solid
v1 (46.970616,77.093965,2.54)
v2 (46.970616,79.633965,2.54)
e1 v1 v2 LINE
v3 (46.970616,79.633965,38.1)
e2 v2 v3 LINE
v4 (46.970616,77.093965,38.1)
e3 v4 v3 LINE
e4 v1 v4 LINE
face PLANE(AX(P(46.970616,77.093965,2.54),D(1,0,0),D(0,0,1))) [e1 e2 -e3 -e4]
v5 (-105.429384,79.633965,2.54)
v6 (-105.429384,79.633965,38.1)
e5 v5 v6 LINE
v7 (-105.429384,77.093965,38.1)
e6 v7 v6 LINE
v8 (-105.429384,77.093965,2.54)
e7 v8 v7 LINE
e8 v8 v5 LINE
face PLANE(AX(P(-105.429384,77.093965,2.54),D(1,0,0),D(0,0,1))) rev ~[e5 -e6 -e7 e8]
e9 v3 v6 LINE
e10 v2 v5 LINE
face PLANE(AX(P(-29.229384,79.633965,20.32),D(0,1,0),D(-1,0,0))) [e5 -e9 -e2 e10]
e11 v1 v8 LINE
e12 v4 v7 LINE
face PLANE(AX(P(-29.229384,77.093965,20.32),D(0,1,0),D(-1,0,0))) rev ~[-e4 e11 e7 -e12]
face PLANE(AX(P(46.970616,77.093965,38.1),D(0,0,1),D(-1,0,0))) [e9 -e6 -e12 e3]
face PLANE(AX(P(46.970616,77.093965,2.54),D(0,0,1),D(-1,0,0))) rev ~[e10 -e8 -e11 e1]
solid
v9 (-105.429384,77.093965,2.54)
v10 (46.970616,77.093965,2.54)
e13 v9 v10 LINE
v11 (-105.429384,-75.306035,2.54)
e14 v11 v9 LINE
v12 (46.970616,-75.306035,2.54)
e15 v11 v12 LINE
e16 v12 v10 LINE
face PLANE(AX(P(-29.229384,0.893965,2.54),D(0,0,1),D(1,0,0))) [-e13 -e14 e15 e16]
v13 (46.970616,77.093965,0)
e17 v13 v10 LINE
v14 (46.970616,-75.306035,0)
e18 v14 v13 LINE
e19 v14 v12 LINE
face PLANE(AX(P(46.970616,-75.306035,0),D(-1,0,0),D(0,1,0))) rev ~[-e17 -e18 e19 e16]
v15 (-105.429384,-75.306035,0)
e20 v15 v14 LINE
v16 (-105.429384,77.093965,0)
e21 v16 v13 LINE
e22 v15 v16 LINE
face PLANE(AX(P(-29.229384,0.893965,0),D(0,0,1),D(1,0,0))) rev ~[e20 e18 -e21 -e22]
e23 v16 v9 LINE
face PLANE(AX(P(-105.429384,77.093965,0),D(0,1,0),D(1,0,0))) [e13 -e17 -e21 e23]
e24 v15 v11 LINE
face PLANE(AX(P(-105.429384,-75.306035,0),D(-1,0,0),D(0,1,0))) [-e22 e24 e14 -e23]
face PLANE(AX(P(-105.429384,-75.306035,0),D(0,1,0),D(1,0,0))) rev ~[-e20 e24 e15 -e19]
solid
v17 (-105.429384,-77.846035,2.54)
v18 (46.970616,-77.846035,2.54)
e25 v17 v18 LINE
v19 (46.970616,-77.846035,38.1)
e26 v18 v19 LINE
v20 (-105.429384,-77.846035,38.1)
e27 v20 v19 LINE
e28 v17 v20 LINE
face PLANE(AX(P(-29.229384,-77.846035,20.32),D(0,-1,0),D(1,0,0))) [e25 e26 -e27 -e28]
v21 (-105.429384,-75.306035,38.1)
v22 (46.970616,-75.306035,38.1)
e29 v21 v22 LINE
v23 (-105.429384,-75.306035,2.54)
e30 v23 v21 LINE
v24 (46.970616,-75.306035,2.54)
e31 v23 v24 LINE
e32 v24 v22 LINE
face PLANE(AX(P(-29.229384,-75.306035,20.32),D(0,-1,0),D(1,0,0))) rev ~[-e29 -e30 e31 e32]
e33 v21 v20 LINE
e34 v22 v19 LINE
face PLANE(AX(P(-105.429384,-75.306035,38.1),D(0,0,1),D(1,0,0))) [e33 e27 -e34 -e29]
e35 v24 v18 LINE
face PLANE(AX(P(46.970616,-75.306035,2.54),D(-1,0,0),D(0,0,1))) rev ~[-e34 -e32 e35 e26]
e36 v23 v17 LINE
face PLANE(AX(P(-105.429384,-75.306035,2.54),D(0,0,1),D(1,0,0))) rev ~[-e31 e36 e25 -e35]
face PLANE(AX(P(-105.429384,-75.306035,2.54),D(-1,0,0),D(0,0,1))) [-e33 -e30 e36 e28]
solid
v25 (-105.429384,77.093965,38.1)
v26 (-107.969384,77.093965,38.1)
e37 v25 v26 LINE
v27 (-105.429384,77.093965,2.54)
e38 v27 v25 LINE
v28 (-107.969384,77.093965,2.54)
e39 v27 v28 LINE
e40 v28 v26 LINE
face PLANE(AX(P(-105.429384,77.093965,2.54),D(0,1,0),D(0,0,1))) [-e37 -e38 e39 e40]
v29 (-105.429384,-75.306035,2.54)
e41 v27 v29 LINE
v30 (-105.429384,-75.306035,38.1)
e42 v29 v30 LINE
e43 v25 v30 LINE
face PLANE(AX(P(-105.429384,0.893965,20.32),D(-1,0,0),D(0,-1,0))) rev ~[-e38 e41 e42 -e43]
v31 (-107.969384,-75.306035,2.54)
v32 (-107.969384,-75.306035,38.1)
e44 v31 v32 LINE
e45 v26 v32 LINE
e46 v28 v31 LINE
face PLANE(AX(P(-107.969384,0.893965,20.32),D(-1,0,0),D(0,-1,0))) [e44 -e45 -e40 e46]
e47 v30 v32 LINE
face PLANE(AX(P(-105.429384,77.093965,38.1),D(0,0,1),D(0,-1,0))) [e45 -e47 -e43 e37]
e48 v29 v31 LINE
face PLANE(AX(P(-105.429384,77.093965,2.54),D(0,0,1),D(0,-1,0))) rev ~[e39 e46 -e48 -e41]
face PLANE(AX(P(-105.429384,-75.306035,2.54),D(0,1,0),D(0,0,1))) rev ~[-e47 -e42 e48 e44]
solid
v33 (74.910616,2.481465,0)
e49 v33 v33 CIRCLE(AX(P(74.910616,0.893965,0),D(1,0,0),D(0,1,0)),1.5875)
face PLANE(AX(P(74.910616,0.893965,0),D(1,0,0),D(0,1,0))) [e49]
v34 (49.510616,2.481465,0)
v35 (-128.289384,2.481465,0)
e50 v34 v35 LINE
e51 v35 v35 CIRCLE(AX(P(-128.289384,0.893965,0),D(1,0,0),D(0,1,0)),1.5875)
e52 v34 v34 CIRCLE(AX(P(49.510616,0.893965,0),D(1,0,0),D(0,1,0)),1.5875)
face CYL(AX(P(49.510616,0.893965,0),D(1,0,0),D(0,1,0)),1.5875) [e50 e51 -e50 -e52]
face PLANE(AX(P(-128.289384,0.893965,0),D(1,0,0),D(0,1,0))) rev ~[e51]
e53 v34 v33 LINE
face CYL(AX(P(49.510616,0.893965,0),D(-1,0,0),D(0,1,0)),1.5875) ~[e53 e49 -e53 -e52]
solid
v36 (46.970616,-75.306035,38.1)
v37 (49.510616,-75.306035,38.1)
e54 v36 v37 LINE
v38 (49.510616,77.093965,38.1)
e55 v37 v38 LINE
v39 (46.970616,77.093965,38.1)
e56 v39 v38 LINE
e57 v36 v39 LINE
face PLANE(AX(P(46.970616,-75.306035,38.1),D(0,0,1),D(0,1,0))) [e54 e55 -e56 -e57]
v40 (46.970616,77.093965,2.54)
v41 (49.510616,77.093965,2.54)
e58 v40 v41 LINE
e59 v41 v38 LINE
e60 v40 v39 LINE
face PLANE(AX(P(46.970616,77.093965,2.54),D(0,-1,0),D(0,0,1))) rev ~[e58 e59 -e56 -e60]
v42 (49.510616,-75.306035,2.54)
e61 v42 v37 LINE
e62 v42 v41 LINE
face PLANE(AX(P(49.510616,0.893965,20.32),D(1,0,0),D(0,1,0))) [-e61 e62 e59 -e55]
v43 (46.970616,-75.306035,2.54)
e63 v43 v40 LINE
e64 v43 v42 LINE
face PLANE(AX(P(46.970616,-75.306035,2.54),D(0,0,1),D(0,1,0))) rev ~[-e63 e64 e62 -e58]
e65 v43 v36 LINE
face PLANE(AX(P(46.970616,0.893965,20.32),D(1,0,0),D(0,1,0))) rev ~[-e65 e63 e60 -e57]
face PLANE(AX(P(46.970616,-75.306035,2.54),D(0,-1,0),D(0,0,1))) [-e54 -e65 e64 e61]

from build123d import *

# Parameters (mm, degrees)
F0_W           = 152.4
F0_H           = 152.4
F1_DEPTH       = 2.54
F2_W           = 152.4
F2_H           = 35.56
F3_DEPTH       = 2.54
F4_W           = 152.4
F4_H           = 35.56
F5_DEPTH       = 2.54
F6_W           = 152.4
F6_H           = 35.56
F7_DEPTH       = 2.54
F8_W           = 152.4
F8_H           = 35.56
F9_DEPTH       = 2.54
F10_R          = 1.5875
F11_DEPTH      = 177.8
F11_DEPTH_BACK = 25.4


with BuildPart() as f1:
    # F0 (on Top) → F1 (new body)
    with BuildSketch(Plane.XY):
        with Locations((-29.2293839186, 0.8939653635)):
            Rectangle(F0_W, F0_H)
    extrude(amount=F1_DEPTH)


with BuildPart() as f3:
    # F2 (on face) → F3 (new body)
    with BuildSketch(Plane.XZ.offset(75.3060346365)):
        with Locations((-29.2293839186, 20.32)):
            Rectangle(F2_W, F2_H)
    extrude(amount=F3_DEPTH)


with BuildPart() as f5:
    # F4 (on face) → F5 (new body)
    with BuildSketch(Plane.YZ.offset(46.9706160814)):
        with Locations((0.8939653635, 20.32)):
            Rectangle(F4_W, F4_H)
    extrude(amount=F5_DEPTH)


with BuildPart() as f7:
    # F6 (on face) → F7 (new body)
    with BuildSketch(Plane(origin=(0, 77.0939653635, 0), x_dir=(-1, 0, 0), z_dir=(0, 1, 0))):
        with Locations((29.2293839186, 20.32)):
            Rectangle(F6_W, F6_H)
    extrude(amount=F7_DEPTH)


with BuildPart() as f9:
    # F8 (on face) → F9 (new body)
    with BuildSketch(Plane(origin=(-105.4293839186, 0, 0), x_dir=(0, -1, 0), z_dir=(-1, 0, 0))):
        with Locations((-0.8939653635, 20.32)):
            Rectangle(F8_W, F8_H)
    extrude(amount=F9_DEPTH)


with BuildPart() as f11:
    # F10 (on face) → F11 (new body, two sides)
    with BuildSketch(Plane.YZ.offset(49.5106160814)) as f11_sk:
        with Locations((0.8939653635, 0)):
            Circle(F10_R)
    extrude(amount=-F11_DEPTH)
    extrude(f11_sk.sketch, amount=F11_DEPTH_BACK)


solid = Compound([f1.part, f3.part, f5.part, f7.part, f9.part, f11.part])
